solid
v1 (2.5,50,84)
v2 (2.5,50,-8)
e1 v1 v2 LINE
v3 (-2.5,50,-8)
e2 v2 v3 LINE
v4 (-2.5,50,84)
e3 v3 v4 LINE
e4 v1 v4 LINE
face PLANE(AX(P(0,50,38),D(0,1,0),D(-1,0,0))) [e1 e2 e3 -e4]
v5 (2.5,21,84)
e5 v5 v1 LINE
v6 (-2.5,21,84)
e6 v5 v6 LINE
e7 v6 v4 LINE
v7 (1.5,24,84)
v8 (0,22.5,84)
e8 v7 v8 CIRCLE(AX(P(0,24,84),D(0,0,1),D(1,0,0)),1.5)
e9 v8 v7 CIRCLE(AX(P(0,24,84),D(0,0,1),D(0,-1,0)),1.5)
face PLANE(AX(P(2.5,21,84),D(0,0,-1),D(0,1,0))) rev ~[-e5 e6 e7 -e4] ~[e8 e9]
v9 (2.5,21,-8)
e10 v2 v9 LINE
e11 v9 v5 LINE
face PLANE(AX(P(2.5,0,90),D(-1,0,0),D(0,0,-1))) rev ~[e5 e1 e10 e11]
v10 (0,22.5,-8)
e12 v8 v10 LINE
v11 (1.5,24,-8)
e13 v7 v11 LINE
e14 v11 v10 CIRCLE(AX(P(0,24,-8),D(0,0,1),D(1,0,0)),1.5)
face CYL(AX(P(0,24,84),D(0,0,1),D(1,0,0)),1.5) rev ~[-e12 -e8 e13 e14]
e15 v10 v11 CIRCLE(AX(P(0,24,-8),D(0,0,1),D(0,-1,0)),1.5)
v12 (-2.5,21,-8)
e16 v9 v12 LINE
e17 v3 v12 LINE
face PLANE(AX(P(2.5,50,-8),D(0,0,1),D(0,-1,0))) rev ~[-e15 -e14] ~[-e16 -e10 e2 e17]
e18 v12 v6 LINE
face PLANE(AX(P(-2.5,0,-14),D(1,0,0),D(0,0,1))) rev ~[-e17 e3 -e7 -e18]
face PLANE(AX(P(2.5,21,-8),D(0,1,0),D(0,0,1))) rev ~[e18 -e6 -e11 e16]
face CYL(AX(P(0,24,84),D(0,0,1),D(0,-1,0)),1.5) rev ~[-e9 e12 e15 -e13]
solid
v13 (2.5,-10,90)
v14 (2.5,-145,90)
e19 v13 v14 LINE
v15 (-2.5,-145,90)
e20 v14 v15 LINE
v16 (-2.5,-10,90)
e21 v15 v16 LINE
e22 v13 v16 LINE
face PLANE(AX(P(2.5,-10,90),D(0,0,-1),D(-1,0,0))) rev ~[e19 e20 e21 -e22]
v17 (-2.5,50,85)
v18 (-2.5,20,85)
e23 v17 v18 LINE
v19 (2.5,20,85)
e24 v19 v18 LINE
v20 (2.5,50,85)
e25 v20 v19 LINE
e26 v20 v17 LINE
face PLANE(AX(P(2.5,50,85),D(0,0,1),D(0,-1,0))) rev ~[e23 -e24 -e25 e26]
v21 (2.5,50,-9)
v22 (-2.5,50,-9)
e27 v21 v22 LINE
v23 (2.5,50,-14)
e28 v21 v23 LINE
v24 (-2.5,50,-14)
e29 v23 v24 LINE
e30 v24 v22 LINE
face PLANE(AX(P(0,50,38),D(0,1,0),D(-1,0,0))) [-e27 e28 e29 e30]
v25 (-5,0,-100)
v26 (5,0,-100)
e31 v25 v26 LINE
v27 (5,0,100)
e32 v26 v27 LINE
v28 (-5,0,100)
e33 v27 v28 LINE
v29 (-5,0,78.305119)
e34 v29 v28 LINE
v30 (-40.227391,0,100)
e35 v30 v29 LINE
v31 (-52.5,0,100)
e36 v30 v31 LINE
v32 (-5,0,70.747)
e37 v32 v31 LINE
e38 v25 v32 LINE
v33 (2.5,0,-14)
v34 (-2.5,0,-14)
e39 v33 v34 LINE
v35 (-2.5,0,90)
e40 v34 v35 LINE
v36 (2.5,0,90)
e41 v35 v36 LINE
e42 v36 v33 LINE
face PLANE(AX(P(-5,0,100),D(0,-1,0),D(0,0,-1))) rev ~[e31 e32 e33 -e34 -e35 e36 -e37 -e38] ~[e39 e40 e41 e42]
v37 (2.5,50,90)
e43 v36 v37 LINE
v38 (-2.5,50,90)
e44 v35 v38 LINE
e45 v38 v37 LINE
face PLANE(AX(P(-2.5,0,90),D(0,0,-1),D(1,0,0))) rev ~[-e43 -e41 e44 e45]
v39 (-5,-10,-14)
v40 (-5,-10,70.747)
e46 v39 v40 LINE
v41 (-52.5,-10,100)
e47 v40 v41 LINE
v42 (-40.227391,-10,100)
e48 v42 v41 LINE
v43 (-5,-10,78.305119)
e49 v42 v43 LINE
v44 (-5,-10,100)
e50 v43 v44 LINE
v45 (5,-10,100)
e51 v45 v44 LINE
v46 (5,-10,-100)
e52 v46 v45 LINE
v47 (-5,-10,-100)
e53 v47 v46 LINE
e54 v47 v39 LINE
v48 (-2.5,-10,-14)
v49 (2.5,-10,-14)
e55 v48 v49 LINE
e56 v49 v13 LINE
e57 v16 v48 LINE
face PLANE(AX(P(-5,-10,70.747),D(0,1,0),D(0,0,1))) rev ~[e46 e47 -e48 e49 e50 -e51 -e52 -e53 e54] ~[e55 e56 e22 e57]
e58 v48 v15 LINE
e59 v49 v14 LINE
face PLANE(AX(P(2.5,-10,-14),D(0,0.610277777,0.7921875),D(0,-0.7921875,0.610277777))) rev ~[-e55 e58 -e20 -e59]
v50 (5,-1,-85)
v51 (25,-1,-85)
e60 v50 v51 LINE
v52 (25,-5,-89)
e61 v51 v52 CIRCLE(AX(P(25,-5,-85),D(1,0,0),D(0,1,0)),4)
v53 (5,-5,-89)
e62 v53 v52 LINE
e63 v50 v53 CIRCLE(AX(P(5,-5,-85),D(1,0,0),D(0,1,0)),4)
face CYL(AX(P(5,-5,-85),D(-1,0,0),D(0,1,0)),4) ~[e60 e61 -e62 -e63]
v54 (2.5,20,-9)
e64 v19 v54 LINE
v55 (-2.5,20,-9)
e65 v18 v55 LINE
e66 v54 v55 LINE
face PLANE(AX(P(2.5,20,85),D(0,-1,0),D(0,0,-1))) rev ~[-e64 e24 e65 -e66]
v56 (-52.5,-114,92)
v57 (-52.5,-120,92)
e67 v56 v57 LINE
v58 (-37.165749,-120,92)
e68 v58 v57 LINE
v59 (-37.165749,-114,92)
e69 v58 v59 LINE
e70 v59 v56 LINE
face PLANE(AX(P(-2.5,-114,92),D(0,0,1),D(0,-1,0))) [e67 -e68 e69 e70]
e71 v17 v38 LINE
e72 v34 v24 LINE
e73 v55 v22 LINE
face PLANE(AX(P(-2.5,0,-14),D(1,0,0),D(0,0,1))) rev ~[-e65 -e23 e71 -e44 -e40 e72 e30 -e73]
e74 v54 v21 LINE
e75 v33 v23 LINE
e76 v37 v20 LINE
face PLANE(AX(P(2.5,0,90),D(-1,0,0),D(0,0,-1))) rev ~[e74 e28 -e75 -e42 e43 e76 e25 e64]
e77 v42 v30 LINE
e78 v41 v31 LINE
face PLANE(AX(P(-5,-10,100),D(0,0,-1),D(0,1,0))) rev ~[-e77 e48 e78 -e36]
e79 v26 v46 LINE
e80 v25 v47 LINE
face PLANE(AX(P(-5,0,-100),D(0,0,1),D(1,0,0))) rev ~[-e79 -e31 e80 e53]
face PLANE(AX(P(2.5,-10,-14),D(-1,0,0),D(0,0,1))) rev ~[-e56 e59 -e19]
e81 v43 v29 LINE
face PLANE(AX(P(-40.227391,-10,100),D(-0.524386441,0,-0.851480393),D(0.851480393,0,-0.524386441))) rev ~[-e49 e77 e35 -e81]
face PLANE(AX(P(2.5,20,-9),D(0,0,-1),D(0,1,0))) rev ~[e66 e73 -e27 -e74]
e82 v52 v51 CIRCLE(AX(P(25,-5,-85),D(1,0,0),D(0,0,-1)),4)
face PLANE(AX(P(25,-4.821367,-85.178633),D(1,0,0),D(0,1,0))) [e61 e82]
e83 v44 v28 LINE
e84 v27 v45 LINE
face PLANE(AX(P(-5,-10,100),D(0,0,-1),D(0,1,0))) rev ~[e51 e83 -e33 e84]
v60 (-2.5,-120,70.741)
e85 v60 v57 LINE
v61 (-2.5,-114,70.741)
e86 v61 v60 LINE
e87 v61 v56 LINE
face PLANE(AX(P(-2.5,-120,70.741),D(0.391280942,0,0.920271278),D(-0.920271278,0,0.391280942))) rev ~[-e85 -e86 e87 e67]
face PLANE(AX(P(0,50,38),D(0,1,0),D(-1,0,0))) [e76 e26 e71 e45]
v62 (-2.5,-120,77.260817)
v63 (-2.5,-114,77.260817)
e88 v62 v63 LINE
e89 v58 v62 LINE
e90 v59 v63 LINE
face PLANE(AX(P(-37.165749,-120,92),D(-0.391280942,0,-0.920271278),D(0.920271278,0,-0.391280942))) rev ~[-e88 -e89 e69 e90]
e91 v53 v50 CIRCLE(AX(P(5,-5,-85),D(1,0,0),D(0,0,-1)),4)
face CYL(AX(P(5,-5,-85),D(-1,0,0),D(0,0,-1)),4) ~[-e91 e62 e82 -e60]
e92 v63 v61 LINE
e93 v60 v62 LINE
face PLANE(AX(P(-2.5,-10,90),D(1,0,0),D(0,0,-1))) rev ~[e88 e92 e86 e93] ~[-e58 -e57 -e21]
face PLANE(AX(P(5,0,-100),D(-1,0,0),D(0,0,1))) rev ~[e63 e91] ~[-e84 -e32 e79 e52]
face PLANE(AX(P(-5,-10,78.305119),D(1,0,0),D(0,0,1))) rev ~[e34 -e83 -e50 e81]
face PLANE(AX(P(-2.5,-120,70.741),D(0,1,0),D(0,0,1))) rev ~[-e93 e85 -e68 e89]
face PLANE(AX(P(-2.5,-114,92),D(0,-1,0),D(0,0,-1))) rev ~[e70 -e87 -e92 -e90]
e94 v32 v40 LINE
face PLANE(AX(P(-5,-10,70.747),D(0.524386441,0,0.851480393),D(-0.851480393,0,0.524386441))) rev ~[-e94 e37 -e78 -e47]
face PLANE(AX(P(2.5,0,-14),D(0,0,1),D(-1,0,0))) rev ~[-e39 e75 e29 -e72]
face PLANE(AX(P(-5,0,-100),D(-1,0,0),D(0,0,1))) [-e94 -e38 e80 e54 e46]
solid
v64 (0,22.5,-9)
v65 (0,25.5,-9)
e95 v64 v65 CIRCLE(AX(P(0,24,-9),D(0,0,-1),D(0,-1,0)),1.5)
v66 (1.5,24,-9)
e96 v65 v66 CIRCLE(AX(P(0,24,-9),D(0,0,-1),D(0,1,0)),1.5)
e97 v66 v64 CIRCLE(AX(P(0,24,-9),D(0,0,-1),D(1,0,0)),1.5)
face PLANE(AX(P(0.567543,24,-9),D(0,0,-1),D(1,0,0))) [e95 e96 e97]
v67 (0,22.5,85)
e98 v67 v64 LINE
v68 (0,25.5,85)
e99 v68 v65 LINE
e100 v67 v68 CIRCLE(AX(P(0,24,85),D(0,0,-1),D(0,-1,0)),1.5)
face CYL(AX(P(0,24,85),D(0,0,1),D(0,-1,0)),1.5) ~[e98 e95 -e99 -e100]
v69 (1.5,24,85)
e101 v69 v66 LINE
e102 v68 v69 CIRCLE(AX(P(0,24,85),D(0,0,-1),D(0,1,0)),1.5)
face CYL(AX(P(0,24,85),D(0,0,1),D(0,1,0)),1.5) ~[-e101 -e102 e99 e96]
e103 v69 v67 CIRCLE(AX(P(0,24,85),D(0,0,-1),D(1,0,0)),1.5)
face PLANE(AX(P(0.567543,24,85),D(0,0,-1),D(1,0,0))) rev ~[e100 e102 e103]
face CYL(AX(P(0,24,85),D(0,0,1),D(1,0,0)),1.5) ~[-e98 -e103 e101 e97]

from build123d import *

# Parameters (mm, degrees)
F0_W      = 10
F0_H      = 200
F1_DEPTH  = 10
F3_DEPTH  = 135
F5_DEPTH  = 7.501
F6_W      = 6
F6_H      = 6
F6_H_2    = 7.259
F6_H_3    = 2
F7_DEPTH  = 50
F9_DEPTH  = 6
F10_W     = 5
F10_H     = 10
F10_H_2   = 9.253
F11_DEPTH = 47.5
F13_DEPTH = 10
F15_DEPTH = 20
F17_DEPTH = 50
F19_DEPTH = 5
F21_DEPTH = 92
F23_DEPTH = 94


# Not quite as in the source:
# - a feature names something its author has since deleted; it is built from what else it names


with BuildPart() as f1:
    # F0 (on Front) → F1 (new body)
    with BuildSketch(Plane.XZ):
        Rectangle(F0_W, F0_H)
    extrude(amount=F1_DEPTH)

    # F2 (on face) → F3 (join)
    with BuildSketch(Plane.XZ.offset(10)):
        Polygon((2.5, 90), (0, 90), (-2.5, 90), (-2.5, -14), (0, -14), (2.5, -14), align=None)
    extrude(amount=F3_DEPTH)

    # F4 (on face) → F5 (cut, through all)
    with BuildSketch(Plane.YZ.offset(2.5)):
        Polygon((-10, -14), (-145, 90), (-145, -14), align=None)
    extrude(amount=-F5_DEPTH, mode=Mode.SUBTRACT)

    # F6 (on face) → F7 (join)
    with BuildSketch(Plane(origin=(-2.5, 0, 0), x_dir=(0, -1, 0), z_dir=(-1, 0, 0))):
        with Locations((117, 87)):
            Rectangle(F6_W, F6_H)
        with Locations((117, 73.741)):
            Rectangle(F6_W, F6_H)
        with Locations((117, 80.3705)):
            Rectangle(F6_W, F6_H_2)
        with Locations((117, 91)):
            Rectangle(F6_W, F6_H_3)
    extrude(amount=F7_DEPTH)

    # F8 (on face) → F9 (cut, through all)
    with BuildSketch(Plane.XZ.offset(120)):
        Polygon((-52.5, 70.741), (-2.5, 70.741), (-52.5, 92), align=None)
        Polygon((-37.1657494443, 92), (-2.5, 77.2608166513), (-2.5, 90), (-2.5, 92), align=None)
    extrude(amount=-F9_DEPTH, mode=Mode.SUBTRACT)

    # F10 (on face) → F11 (join)
    with BuildSketch(Plane(origin=(-5, 0, 0), x_dir=(0, -1, 0), z_dir=(-1, 0, 0))):
        with Locations((7.5, 75.747)):
            Rectangle(F10_W, F10_H)
        with Locations((2.5, 75.747)):
            Rectangle(F10_W, F10_H)
        with Locations((2.5, 85.3735)):
            Rectangle(F10_W, F10_H_2)
        with Locations((7.5, 85.3735)):
            Rectangle(F10_W, F10_H_2)
        with Locations((7.5, 95)):
            Rectangle(F10_W, F10_H)
        with Locations((2.5, 95)):
            Rectangle(F10_W, F10_H)
    extrude(amount=F11_DEPTH)

    # F12 (on face) → F13 (cut, through all)
    with BuildSketch(Plane.XZ.offset(10)):
        Polygon((-5, 70.747), (-52.5, 100), (-52.5, 70.747), align=None)
        Polygon((-5, 100), (-40.2273908257, 100), (-5, 78.3051186563), align=None)
    extrude(amount=-F13_DEPTH, mode=Mode.SUBTRACT)

    # F14 (on face) → F15 (join)
    with BuildSketch(Plane.YZ.offset(5)):
        with BuildLine():
            ThreePointArc((-1, -85), (-7.8284271247, -82.1715728753), (-5, -89))
            ThreePointArc((-5, -89), (-2.1715728753, -87.8284271247), (-1, -85))
        make_face()
    extrude(amount=F15_DEPTH)

    # F16 (on face) → F17 (join)
    with BuildSketch(Plane(origin=(0, 0, 0), x_dir=(-1, 0, 0), z_dir=(0, 1, 0))):
        Polygon((2.5, 90), (0, 90), (-2.5, 90), (-2.5, -14), (2.5, -14), align=None)
    extrude(amount=F17_DEPTH)

    # F18 (on face) → F19 (cut, through all)
    with BuildSketch(Plane.YZ.offset(2.5)):
        Polygon((50, 84), (50, 85), (20, 85), (20, -9), (50, -9), (50, -8), (21, -8), (21, 84), align=None)
    extrude(amount=-F19_DEPTH, mode=Mode.SUBTRACT)

    # F20 (on face) → F21 (cut, through all)
    with BuildSketch(Plane.XY.offset(84)):
        with BuildLine():
            ThreePointArc((0, 22.5), (1.0606601718, 22.9393398282), (1.5, 24))
            ThreePointArc((1.5, 24), (-1.0606601718, 25.0606601718), (0, 22.5))
        make_face()
    extrude(amount=-F21_DEPTH, mode=Mode.SUBTRACT)


with BuildPart() as f23:
    # F22 (on face) → F23 (new body, through all)
    with BuildSketch(Plane(origin=(0, 0, 85), x_dir=(1, 0, 0), z_dir=(0, 0, -1))):
        with BuildLine():
            ThreePointArc((1.5, -24), (1.0606601718, -22.9393398282), (0, -22.5))
            Line((0, -22.5), (0, -24))
            Line((0, -24), (0, -25.5))
            ThreePointArc((0, -25.5), (1.0606601718, -25.0606601718), (1.5, -24))
        make_face()
        with BuildLine():
            Line((0, -24), (0, -22.5))
            ThreePointArc((0, -22.5), (-1.5, -24), (0, -25.5))
            Line((0, -25.5), (0, -24))
        make_face()
    extrude(amount=F23_DEPTH)


solid = Compound([f1.part, f23.part])
